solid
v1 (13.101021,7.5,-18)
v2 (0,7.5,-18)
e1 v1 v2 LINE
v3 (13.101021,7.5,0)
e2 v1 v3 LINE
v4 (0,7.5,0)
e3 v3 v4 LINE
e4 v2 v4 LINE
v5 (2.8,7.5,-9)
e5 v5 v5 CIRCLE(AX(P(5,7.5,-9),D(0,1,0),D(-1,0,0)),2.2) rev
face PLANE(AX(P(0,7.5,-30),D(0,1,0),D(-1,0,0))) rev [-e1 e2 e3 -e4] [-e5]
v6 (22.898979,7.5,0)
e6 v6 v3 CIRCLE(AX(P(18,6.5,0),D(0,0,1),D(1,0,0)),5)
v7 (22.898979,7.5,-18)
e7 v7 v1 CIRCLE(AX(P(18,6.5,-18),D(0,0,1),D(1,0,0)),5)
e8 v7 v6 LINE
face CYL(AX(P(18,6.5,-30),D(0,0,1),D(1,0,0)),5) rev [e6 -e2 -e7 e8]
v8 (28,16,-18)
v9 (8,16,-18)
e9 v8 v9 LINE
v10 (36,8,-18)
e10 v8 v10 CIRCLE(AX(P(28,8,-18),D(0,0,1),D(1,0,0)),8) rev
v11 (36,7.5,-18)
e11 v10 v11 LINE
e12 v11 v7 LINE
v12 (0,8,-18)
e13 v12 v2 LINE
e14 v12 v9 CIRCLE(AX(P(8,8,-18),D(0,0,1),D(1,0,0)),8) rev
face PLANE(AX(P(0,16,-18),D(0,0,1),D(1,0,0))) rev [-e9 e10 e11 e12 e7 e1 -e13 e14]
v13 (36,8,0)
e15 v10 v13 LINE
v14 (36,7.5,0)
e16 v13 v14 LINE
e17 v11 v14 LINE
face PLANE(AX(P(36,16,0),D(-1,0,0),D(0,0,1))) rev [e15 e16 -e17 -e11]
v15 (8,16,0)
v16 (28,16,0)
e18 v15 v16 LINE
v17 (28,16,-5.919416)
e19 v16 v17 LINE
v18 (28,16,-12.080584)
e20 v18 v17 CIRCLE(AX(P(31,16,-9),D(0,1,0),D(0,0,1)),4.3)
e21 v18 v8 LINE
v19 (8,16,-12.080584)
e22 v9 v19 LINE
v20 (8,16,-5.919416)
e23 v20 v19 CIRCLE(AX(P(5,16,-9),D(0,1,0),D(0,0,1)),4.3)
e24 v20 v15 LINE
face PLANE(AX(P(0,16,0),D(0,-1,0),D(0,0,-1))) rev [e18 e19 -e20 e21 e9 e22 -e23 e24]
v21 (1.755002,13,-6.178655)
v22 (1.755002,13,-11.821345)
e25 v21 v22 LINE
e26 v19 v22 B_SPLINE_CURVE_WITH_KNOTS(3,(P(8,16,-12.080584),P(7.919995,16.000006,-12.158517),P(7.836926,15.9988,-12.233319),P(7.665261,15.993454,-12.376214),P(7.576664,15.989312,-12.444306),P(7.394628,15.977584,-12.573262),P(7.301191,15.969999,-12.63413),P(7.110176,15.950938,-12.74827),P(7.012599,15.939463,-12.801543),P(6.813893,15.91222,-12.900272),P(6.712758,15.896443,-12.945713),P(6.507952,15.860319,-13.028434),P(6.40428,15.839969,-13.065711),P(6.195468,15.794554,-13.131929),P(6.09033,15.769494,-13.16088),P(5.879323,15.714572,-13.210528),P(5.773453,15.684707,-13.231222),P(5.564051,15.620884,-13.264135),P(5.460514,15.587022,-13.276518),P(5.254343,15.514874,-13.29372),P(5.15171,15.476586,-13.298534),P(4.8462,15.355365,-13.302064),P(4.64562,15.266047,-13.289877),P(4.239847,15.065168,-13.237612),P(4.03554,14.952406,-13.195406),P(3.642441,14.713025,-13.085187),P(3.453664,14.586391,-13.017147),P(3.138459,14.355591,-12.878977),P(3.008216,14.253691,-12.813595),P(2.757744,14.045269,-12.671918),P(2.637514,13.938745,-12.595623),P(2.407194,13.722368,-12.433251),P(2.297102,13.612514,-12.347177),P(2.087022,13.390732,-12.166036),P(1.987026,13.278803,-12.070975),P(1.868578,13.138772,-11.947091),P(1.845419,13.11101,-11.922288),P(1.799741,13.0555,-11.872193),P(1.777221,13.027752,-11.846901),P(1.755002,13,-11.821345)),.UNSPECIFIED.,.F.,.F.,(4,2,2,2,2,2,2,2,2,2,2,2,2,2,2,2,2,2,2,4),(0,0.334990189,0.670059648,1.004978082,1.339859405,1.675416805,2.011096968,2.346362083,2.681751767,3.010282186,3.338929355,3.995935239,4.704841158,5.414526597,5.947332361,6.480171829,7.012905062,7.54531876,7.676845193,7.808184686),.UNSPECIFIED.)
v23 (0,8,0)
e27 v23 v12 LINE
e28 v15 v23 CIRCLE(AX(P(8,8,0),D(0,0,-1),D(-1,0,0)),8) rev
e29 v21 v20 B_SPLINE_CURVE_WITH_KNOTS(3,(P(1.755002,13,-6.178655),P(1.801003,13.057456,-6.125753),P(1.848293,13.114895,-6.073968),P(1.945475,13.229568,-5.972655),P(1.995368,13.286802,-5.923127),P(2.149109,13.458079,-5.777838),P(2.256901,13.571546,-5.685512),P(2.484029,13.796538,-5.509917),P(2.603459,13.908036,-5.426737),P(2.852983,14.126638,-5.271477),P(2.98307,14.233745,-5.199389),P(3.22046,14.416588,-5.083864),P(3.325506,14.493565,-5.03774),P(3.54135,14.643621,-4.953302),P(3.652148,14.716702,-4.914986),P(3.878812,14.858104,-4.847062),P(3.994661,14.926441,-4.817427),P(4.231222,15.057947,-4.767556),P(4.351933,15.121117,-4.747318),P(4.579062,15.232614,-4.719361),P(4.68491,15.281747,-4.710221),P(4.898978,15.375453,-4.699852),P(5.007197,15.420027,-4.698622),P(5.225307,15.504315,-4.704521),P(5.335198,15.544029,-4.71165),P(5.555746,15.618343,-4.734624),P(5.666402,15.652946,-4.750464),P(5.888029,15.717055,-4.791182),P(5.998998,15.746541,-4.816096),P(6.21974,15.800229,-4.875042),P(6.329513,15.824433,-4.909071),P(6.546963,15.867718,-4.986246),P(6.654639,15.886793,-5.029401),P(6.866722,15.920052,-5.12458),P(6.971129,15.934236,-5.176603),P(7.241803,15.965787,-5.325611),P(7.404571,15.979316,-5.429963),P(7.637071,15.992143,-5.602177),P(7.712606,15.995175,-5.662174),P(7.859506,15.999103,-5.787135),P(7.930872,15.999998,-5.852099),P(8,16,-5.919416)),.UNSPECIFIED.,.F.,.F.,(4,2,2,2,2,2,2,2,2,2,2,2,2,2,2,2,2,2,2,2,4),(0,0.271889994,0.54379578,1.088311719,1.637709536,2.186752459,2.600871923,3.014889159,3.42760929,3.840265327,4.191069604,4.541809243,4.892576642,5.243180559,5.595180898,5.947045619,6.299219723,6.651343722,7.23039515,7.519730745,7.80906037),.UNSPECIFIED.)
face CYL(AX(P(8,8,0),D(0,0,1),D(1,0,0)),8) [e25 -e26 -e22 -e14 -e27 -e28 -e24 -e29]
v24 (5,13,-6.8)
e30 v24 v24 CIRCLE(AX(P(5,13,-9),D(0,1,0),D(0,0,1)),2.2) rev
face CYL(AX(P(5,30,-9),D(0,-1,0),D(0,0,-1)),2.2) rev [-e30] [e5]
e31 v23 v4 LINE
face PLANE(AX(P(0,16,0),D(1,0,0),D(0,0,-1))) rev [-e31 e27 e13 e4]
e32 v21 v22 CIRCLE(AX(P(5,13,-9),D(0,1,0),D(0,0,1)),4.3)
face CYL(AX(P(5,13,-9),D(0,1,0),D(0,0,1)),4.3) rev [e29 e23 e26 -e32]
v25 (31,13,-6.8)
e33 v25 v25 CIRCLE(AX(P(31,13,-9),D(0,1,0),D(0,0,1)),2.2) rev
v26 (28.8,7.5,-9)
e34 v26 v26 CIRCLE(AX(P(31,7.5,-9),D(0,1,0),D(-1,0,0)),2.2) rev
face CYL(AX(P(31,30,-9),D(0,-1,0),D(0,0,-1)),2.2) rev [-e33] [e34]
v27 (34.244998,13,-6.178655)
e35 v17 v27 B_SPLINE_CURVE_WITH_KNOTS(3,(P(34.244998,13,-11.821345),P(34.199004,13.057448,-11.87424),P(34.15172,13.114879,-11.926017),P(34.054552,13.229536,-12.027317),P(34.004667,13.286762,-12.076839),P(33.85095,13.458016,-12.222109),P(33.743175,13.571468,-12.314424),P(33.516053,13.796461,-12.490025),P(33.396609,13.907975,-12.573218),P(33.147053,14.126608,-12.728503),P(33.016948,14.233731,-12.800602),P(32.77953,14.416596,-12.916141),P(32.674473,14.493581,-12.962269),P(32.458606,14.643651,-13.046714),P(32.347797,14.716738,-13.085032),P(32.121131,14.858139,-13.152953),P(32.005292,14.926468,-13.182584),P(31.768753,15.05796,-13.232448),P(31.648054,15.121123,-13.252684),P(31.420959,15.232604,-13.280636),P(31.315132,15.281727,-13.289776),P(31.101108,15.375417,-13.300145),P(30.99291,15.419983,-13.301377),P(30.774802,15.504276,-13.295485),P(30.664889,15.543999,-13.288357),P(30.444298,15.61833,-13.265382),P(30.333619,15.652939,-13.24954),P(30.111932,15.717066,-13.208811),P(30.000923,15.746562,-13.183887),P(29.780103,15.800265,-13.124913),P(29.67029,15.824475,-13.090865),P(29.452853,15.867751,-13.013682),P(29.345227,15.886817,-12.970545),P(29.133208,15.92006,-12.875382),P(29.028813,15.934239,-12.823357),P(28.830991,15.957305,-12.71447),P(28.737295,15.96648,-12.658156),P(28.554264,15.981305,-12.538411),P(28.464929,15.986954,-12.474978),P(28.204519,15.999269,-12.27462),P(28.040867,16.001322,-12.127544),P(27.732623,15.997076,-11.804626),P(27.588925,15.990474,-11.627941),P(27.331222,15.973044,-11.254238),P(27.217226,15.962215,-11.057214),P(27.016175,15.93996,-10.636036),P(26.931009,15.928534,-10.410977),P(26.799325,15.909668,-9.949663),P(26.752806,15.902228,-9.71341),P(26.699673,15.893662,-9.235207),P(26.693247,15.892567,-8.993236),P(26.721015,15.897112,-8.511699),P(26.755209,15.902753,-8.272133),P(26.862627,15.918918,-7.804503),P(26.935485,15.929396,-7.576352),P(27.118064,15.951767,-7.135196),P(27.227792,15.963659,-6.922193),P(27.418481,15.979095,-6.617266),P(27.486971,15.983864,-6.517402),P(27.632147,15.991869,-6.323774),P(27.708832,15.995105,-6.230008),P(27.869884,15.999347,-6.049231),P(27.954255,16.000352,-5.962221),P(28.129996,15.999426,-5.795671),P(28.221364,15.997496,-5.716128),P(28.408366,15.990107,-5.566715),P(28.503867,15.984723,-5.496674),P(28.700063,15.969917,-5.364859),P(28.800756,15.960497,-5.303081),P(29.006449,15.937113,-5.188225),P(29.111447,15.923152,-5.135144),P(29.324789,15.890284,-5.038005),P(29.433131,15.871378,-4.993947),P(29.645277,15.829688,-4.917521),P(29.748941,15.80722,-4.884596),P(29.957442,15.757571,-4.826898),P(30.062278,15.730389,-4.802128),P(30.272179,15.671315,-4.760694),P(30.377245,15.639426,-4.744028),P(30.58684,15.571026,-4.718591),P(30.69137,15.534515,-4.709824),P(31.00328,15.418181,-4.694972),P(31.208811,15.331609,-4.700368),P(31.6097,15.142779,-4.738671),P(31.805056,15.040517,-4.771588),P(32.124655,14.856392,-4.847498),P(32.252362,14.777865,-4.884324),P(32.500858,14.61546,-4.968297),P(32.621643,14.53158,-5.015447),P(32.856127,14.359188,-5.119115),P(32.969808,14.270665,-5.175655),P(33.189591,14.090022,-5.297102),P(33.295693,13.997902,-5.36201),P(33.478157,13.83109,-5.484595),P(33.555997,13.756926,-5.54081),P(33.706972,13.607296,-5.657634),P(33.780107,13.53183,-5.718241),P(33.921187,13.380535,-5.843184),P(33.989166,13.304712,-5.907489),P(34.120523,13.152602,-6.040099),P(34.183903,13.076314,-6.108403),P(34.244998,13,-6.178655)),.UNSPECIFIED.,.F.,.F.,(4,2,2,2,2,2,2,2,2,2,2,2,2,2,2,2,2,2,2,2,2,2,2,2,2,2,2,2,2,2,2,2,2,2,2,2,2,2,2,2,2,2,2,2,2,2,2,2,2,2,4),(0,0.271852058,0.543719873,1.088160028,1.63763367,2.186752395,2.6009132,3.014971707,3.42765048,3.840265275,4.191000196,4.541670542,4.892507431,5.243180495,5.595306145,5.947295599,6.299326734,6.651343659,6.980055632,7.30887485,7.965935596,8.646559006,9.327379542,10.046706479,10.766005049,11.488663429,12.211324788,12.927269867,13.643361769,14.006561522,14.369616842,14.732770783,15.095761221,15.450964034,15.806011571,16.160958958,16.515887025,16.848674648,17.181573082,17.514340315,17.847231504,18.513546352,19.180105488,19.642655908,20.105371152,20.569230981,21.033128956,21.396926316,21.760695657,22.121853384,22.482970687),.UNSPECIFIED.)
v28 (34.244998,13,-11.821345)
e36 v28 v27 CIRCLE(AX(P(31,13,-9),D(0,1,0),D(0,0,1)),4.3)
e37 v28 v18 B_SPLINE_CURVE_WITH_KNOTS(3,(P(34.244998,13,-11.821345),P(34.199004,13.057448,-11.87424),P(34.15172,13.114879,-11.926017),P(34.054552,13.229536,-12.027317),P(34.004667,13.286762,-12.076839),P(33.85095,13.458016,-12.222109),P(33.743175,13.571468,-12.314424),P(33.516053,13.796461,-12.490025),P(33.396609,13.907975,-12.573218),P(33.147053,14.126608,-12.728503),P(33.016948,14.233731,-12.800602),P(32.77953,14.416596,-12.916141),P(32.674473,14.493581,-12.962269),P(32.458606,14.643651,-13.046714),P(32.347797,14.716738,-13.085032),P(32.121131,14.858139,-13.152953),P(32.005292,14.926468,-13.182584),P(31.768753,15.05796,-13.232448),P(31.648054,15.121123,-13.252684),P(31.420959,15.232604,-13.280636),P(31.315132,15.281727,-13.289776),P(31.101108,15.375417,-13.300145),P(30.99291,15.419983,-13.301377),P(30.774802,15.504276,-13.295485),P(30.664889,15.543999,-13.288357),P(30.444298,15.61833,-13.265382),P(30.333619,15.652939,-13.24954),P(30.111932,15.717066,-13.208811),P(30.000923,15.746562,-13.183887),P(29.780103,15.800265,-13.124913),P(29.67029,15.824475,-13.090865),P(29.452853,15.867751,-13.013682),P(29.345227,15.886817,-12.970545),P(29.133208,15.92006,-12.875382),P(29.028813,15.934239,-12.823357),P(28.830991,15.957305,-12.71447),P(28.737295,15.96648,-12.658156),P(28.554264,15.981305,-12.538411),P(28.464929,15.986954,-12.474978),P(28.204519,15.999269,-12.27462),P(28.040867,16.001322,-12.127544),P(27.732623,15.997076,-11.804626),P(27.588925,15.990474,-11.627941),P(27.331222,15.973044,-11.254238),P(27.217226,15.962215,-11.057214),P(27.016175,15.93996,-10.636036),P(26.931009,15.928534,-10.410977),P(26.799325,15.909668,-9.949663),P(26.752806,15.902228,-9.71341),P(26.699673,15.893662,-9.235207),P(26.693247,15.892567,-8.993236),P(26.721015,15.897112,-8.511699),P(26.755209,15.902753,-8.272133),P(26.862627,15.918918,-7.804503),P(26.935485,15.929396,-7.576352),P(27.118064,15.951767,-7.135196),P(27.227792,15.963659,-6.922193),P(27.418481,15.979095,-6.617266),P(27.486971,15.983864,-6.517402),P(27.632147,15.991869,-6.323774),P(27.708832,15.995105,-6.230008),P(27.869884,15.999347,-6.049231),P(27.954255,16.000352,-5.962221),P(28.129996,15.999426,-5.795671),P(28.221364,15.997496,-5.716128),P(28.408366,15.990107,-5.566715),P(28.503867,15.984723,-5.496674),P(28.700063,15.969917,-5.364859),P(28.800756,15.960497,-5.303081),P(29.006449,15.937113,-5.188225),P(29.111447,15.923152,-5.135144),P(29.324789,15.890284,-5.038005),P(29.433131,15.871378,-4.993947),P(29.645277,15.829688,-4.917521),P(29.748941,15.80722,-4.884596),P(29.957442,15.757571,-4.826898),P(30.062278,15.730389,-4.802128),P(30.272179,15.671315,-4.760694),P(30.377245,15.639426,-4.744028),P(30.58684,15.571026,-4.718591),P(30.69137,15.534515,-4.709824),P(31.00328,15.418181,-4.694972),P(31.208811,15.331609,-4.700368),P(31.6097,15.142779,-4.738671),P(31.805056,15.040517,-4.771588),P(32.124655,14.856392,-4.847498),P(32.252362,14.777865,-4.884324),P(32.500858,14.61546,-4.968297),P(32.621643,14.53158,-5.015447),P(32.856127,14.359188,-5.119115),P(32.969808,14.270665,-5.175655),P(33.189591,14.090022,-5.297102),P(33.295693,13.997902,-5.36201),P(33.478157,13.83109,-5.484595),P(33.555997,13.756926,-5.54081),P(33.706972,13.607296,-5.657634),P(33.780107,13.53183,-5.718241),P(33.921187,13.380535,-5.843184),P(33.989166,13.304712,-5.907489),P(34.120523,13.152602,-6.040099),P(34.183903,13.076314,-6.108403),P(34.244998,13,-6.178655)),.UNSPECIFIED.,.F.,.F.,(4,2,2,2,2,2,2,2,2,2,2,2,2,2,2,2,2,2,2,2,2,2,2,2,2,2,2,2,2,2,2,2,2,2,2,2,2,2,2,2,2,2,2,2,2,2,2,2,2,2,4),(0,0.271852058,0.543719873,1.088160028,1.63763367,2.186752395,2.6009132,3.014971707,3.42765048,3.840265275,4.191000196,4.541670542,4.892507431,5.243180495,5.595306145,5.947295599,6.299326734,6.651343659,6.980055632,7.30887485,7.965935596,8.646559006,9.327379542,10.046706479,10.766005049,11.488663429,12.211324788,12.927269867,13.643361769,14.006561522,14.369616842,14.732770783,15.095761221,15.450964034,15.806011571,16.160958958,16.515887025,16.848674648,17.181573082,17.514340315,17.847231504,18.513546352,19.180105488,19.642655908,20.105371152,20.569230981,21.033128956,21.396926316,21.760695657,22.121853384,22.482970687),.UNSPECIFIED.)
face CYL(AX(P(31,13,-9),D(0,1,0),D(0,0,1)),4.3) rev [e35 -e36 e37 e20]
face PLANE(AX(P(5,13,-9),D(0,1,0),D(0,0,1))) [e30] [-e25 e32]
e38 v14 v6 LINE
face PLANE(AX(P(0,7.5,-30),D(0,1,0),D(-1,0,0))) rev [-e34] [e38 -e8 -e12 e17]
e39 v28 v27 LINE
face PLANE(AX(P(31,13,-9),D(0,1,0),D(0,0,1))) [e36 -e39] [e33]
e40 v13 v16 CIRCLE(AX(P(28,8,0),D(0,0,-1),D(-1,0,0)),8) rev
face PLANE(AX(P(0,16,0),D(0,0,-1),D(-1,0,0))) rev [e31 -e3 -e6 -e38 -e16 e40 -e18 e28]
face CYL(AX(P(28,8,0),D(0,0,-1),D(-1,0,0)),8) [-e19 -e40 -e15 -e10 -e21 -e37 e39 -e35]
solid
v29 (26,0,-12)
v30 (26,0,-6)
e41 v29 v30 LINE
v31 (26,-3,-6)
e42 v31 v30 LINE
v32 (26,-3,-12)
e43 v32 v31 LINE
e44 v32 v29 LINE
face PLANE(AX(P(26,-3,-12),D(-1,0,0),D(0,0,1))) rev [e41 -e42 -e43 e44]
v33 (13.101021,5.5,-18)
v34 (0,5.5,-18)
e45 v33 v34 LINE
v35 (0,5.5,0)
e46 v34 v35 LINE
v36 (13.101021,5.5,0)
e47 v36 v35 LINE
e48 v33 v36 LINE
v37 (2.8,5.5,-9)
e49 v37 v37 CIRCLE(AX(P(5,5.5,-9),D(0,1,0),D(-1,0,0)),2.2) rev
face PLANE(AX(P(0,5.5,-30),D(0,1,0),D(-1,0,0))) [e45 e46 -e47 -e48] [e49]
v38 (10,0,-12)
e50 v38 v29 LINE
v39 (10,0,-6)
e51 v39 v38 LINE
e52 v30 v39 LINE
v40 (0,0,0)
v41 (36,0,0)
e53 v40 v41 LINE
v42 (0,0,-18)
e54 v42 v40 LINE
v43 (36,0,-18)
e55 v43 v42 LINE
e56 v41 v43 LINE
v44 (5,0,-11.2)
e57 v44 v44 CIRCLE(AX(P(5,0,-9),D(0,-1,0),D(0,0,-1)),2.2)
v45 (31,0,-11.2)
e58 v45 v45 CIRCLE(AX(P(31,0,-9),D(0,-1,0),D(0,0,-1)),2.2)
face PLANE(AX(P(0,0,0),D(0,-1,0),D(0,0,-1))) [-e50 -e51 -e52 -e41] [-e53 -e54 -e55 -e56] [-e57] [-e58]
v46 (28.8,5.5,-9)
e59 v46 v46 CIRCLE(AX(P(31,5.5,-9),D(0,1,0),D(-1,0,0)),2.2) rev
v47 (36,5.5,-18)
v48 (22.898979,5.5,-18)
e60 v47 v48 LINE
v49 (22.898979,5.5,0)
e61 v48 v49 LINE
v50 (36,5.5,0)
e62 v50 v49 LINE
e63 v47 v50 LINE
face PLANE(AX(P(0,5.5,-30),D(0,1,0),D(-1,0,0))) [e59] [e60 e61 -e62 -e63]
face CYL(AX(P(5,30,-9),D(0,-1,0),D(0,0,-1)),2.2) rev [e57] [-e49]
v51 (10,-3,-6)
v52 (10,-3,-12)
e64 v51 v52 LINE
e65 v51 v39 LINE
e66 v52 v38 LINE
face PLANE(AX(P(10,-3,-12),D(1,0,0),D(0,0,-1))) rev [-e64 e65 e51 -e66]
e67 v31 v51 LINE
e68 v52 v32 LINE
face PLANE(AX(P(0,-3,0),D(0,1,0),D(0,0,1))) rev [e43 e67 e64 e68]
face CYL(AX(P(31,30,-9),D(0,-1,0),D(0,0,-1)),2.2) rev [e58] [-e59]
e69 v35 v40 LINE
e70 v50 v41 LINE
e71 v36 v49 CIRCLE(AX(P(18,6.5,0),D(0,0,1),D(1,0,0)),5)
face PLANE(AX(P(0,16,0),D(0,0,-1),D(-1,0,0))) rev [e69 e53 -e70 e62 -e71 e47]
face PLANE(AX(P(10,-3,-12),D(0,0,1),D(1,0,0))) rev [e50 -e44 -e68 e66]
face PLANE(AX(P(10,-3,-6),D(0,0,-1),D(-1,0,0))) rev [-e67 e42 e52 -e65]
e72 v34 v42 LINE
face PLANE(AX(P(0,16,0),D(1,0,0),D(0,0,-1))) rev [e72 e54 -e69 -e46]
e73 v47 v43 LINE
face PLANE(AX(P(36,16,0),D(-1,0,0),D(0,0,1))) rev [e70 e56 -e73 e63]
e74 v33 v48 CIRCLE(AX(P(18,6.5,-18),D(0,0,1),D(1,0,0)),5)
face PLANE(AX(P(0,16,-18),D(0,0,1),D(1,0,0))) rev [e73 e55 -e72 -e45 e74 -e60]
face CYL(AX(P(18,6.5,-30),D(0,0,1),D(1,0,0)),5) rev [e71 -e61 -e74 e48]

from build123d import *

# Parameters (mm, degrees)
SKETCH_1_W          = 36
SKETCH_1_H          = 18
EXTRUDE_1_DEPTH     = 16
SKETCH_2_W          = 16
SKETCH_2_H          = 6
EXTRUDE_2_DEPTH     = 3
SKETCH_3_R          = 2.2
CUT_EXTRUDE_1_DEPTH = 30
CUT_EXTRUDE_2_DEPTH = 30
FILLET_START        = -18
FILLET_1_DEPTH      = 18
SKETCH_8_R          = 4.3
CUT_EXTRUDE_6_DEPTH = 3


with BuildPart() as part:
    # Эскиз1 → Бобышка-Вытянуть1 (new body)
    with BuildSketch(Plane(origin=(0, 0, 0), x_dir=(1, 0, 0), z_dir=(0, 1, 0))):
        with Locations((18, 9)):
            Rectangle(SKETCH_1_W, SKETCH_1_H)
    extrude(amount=EXTRUDE_1_DEPTH)

    # Эскиз2 → Бобышка-Вытянуть2 (add)
    with BuildSketch(Plane.XZ):
        with Locations((18, -9)):
            Rectangle(SKETCH_2_W, SKETCH_2_H)
    extrude(amount=EXTRUDE_2_DEPTH)

    # Эскиз3 → Вырез-Вытянуть1 (cut)
    with BuildSketch(Plane.XZ):
        with Locations(Location((5, -9, 0), (0, 0, 270))):
            Circle(SKETCH_3_R)
        with Locations(Location((31, -9, 0), (0, 0, 270))):
            Circle(SKETCH_3_R)
    extrude(amount=-CUT_EXTRUDE_1_DEPTH, mode=Mode.SUBTRACT)

    # Эскиз4 → Вырез-Вытянуть2 (cut)
    with BuildSketch(Plane.XY):
        with BuildLine():
            Line((13.101020514, 7.5), (22.898979486, 7.5))
            ThreePointArc((22.898979486, 7.5), (18, 11.5), (13.101020514, 7.5))
        make_face()
        with BuildLine():
            ThreePointArc((23, 6.5), (22.974680765, 7.00254481), (22.898979486, 7.5))
            Line((22.898979486, 7.5), (13.101020514, 7.5))
            ThreePointArc((13.101020514, 7.5), (13, 6.5), (13.101020514, 5.5))
            Line((13.101020514, 5.5), (22.898979486, 5.5))
            ThreePointArc((22.898979486, 5.5), (22.974680765, 5.99745519), (23, 6.5))
        make_face()
        with BuildLine():
            ThreePointArc((13.101020514, 5.5), (18, 1.5), (22.898979486, 5.5))
            Line((22.898979486, 5.5), (13.101020514, 5.5))
        make_face()
        with BuildLine():
            ThreePointArc((13.101020514, 5.5), (13, 6.5), (13.101020514, 7.5))
            Line((13.101020514, 7.5), (0, 7.5))
            Line((0, 7.5), (0, 5.5))
            Line((0, 5.5), (13.101020514, 5.5))
        make_face()
        with BuildLine():
            Line((36, 5.5), (36, 7.5))
            Line((36, 7.5), (22.898979486, 7.5))
            ThreePointArc((22.898979486, 7.5), (22.974680765, 7.00254481), (23, 6.5))
            ThreePointArc((23, 6.5), (22.974680765, 5.99745519), (22.898979486, 5.5))
            Line((22.898979486, 5.5), (36, 5.5))
        make_face()
    extrude(amount=-CUT_EXTRUDE_2_DEPTH, mode=Mode.SUBTRACT)


with BuildPart() as cut_extrude_2_piece_1:
    # of the separate pieces the step leaves, piece 1, a body of its own (cut_extrude_2_pieces)
    add(part.part.solids().sort_by_distance((13.101020514, 7.5, 0))[0])

    # Скругление1: read off the stored shape, not the designer's step
    # Скругление1 outline → Скругление1 (cut)
    with BuildSketch(Plane.XY.offset(FILLET_START)):
        with BuildLine():
            ThreePointArc((0, 8), (2.343145751, 13.656854249), (8, 16))
            Line((8, 16), (0, 16))
            Line((0, 16), (0, 8))
        make_face()
        with BuildLine():
            Line((36, 16), (28, 16))
            ThreePointArc((28, 16), (33.656854249, 13.656854249), (36, 8))
            Line((36, 8), (36, 16))
        make_face()
    extrude(amount=FILLET_1_DEPTH, mode=Mode.SUBTRACT)

    # Эскиз8 → Вырез-Вытянуть6 (cut)
    with BuildSketch(Plane(origin=(0, 16, 0), x_dir=(1, 0, 0), z_dir=(0, 1, 0))):
        with Locations((5, 9)):
            Circle(SKETCH_8_R)
        with Locations((31, 9)):
            Circle(SKETCH_8_R)
    extrude(amount=-CUT_EXTRUDE_6_DEPTH, mode=Mode.SUBTRACT)


with BuildPart() as cut_extrude_2_piece_2:
    # of the separate pieces the step leaves, piece 2, a body of its own (cut_extrude_2_pieces)
    add(part.part.solids().sort_by_distance((0, 0, 0))[0])


solid = Compound([cut_extrude_2_piece_1.part, cut_extrude_2_piece_2.part])
